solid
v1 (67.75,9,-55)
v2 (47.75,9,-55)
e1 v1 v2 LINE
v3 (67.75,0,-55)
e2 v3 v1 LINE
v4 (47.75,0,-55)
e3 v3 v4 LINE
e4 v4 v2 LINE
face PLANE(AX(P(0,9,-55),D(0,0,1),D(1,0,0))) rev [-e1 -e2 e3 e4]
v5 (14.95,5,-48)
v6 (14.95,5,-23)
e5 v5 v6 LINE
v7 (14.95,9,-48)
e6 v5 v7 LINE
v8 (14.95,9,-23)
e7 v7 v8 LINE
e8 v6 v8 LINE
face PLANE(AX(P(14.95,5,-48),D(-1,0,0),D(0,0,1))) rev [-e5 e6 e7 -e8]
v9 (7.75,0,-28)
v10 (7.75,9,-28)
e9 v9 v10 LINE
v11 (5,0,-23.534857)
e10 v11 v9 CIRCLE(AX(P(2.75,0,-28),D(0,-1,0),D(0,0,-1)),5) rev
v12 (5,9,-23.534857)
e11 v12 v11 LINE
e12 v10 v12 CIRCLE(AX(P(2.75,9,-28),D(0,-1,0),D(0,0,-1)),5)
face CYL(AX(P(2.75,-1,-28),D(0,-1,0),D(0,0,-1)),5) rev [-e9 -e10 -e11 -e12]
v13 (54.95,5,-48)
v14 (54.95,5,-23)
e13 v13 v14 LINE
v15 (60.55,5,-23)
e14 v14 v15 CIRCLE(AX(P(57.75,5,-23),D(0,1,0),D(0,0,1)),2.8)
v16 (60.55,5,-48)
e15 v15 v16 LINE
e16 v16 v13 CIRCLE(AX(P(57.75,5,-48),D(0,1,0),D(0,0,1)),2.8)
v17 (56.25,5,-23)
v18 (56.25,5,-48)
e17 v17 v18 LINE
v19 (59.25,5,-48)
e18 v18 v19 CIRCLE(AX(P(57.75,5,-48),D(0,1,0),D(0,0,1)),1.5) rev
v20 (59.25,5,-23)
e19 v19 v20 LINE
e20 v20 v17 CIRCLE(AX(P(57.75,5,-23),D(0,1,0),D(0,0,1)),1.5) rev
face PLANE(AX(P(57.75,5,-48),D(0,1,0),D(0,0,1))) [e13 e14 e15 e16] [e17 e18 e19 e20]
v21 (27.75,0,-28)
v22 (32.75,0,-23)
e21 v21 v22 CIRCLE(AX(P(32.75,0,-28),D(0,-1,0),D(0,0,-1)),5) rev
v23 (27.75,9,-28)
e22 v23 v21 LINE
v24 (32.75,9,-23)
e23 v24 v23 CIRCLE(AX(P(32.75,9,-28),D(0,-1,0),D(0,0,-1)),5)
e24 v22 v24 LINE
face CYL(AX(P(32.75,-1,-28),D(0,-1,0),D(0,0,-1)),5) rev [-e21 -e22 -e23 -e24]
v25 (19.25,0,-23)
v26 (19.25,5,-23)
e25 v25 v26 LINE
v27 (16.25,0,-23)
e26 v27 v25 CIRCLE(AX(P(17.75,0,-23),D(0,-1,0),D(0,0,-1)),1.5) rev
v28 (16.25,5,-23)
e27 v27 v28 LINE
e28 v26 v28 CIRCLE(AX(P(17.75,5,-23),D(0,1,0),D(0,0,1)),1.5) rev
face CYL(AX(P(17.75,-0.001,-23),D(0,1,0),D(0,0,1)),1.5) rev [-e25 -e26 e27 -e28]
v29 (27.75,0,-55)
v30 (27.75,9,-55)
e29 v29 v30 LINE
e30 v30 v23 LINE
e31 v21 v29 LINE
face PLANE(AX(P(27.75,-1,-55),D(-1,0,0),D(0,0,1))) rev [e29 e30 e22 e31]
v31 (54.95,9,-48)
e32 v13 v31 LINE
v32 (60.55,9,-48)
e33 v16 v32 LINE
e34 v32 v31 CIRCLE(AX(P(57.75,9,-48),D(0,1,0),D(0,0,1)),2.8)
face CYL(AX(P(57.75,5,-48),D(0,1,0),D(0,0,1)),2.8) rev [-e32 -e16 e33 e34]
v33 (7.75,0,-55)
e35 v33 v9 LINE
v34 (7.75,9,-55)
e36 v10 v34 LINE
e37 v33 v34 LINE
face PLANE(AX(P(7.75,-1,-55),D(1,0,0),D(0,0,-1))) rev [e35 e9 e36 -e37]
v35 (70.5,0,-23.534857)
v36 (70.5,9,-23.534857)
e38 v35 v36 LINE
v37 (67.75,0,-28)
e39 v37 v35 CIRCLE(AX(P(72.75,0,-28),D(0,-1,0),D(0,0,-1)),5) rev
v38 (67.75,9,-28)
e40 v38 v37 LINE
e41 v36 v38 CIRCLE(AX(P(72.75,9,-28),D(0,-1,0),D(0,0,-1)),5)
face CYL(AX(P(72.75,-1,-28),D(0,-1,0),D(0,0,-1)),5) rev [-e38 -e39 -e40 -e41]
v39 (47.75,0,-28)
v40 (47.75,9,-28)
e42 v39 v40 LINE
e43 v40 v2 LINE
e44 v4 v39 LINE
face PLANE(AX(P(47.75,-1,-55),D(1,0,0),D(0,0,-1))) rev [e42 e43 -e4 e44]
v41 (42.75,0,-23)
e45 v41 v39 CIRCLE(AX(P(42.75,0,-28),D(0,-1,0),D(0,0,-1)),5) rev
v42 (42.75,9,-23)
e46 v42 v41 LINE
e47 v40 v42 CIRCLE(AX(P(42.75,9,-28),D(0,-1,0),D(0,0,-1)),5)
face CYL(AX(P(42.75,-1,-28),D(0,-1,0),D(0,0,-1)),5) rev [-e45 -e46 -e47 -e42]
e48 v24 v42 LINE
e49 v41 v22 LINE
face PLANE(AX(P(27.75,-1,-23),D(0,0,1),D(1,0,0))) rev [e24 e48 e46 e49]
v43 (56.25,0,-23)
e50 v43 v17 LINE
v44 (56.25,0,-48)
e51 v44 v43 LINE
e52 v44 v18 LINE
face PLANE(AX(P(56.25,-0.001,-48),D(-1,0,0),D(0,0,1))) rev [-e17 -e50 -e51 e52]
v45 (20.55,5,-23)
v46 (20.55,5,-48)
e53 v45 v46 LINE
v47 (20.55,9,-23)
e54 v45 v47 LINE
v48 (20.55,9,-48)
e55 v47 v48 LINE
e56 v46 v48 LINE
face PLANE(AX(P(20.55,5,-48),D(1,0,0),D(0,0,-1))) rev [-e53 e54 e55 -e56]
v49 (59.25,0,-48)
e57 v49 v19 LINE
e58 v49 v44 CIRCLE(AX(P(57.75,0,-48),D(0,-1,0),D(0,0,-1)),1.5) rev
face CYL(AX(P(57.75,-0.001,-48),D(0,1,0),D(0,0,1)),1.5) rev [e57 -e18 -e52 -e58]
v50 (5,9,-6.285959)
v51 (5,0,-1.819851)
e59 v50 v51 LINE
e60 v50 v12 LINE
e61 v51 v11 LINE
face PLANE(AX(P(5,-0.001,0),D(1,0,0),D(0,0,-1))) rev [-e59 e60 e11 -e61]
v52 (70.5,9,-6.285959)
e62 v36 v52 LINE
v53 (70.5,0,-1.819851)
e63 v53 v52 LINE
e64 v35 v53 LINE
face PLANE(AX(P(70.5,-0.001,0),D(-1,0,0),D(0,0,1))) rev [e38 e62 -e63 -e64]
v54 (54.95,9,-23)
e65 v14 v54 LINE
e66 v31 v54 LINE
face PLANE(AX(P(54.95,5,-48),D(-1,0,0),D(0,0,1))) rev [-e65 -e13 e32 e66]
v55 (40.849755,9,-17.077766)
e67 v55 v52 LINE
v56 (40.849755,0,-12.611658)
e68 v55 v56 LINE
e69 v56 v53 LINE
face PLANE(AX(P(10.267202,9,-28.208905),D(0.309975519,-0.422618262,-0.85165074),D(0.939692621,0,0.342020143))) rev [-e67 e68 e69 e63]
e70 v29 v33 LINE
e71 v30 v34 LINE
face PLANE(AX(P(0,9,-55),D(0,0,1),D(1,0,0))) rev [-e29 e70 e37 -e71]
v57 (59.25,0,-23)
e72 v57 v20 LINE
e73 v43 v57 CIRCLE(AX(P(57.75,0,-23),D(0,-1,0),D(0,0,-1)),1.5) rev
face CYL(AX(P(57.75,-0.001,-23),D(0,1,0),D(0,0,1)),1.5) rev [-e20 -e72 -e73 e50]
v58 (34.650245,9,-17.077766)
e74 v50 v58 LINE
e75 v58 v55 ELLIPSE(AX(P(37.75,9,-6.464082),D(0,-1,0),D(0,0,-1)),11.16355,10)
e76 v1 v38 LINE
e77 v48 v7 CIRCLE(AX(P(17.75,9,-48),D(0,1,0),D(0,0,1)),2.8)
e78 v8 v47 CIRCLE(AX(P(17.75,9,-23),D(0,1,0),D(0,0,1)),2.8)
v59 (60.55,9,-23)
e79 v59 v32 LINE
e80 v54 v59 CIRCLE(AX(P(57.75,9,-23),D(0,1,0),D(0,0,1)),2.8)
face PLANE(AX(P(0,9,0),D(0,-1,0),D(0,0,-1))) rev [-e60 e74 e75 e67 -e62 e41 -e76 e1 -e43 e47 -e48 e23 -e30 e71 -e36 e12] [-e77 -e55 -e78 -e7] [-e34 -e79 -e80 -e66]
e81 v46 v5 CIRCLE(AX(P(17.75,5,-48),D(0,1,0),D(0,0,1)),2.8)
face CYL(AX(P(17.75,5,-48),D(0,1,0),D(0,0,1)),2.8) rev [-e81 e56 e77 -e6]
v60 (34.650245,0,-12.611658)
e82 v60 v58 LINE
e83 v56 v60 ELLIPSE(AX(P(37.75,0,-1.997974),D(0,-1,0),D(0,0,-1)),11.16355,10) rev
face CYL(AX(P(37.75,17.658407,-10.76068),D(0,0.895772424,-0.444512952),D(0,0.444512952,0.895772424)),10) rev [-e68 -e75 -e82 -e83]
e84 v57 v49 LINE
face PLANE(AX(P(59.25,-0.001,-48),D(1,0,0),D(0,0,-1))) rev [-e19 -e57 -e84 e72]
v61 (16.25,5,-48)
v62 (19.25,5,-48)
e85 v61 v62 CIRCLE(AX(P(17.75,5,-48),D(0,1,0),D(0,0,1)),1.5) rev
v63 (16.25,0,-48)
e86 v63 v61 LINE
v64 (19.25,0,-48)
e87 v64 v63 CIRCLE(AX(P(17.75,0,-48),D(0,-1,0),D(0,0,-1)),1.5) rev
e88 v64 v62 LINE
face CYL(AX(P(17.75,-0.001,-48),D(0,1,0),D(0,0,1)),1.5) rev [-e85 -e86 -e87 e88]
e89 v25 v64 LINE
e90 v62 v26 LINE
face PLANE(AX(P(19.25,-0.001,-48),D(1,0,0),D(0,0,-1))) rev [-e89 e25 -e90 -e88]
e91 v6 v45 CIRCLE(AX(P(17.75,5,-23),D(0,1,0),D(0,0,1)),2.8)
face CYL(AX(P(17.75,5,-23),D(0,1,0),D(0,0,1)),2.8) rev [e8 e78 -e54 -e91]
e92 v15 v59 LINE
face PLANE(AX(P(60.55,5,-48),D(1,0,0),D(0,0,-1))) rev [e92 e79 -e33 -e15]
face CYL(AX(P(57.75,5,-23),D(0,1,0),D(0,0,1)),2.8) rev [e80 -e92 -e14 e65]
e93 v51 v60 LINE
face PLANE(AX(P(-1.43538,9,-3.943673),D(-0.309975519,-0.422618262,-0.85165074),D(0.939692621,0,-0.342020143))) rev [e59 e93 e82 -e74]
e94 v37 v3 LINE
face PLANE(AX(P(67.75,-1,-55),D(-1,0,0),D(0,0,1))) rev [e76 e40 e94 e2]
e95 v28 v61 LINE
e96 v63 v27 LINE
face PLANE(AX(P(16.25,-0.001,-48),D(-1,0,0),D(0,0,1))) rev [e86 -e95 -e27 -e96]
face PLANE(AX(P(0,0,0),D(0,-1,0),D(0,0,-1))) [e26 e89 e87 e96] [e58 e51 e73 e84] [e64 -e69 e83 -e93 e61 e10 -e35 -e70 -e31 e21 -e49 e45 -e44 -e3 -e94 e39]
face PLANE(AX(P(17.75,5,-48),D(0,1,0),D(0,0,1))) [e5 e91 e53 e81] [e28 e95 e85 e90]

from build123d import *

# Parameters (mm, degrees)
BOSS_EXTRUDE1_DEPTH = 9
CUT_EXTRUDE2_REACH  = 95.842
SKETCH5_W           = 20
SKETCH5_H           = 32
SKETCH5_W_2         = 7.75
CUT_EXTRUDE3_DEPTH  = 10
FILLET1_R           = 5
CUT_EXTRUDE4_DEPTH  = 4
CHAMFER1_SIZE       = 9
CHAMFER1_SIZE_2     = 4.196768923
FILLET2_R           = 10
CUT_EXTRUDE5_REACH  = 95.842
SKETCH7_W           = 5
SKETCH7_H           = 33.085129134
SKETCH7_H_2         = 33.745309592


with BuildPart() as part:
    # Sketch1 → Boss-Extrude1 (new body)
    with BuildSketch(Plane(origin=(0, 0, 0), x_dir=(1, 0, 0), z_dir=(0, 1, 0))):
        Polygon((0, 0), (0, 55), (75.5, 55), (75.5, 0), (37.75, 13.739876344), align=None)
    extrude(amount=BOSS_EXTRUDE1_DEPTH)

    # Sketch4 → Cut-Extrude2 (cut, up to next)
    with BuildSketch(Plane(origin=(0, 9, 0), x_dir=(1, 0, 0), z_dir=(0, 1, 0)), mode=Mode.PRIVATE) as cut_extrude2_sk1:
        with BuildLine():
            Line((19.25, 48), (19.25, 23))
            ThreePointArc((19.25, 23), (17.75, 21.5), (16.25, 23))
            Line((16.25, 23), (16.25, 48))
            ThreePointArc((16.25, 48), (17.75, 49.5), (19.25, 48))
        make_face()
    cut_extrude2_tool1 = extrude(cut_extrude2_sk1.sketch, amount=-CUT_EXTRUDE2_REACH, mode=Mode.PRIVATE) & part.part
    # Sketch4 → Cut-Extrude2 (cut, up to next)
    with BuildSketch(Plane(origin=(0, 9, 0), x_dir=(1, 0, 0), z_dir=(0, 1, 0)), mode=Mode.PRIVATE) as cut_extrude2_sk2:
        with BuildLine():
            Line((59.25, 48), (59.25, 23))
            ThreePointArc((59.25, 23), (57.75, 21.5), (56.25, 23))
            Line((56.25, 23), (56.25, 48))
            ThreePointArc((56.25, 48), (57.75, 49.5), (59.25, 48))
        make_face()
    cut_extrude2_tool2 = extrude(cut_extrude2_sk2.sketch, amount=-CUT_EXTRUDE2_REACH, mode=Mode.PRIVATE) & part.part
    add(cut_extrude2_tool1.solids().sort_by_distance((17.75, 9, -35.5))[0], mode=Mode.SUBTRACT)
    add(cut_extrude2_tool2.solids().sort_by_distance((57.75, 9, -35.5))[0], mode=Mode.SUBTRACT)

    # Sketch5 → Cut-Extrude3 (cut)
    with BuildSketch(Plane(origin=(0, 9, 0), x_dir=(1, 0, 0), z_dir=(0, 1, 0))):
        with Locations((37.75, 39)):
            Rectangle(SKETCH5_W, SKETCH5_H)
        with Locations((71.625, 39)):
            Rectangle(SKETCH5_W_2, SKETCH5_H)
        with Locations((3.875, 39)):
            Rectangle(SKETCH5_W_2, SKETCH5_H)
    extrude(amount=-CUT_EXTRUDE3_DEPTH, mode=Mode.SUBTRACT)

    # Fillet1
    fillet1_edges = [part.edges().sort_by_distance(p)[0] for p in [
        (27.75, 4.5, -23),
        (47.75, 4.5, -23),
        (7.75, 4.5, -23),
        (67.75, 4.5, -23),
    ]]
    fillet(fillet1_edges, radius=FILLET1_R)

    # Sketch6 → Cut-Extrude4 (cut)
    with BuildSketch(Plane(origin=(0, 9, 0), x_dir=(1, 0, 0), z_dir=(0, 1, 0))):
        with BuildLine():
            Line((20.55, 48), (20.55, 23))
            ThreePointArc((20.55, 23), (17.75, 20.2), (14.95, 23))
            Line((14.95, 23), (14.95, 48))
            ThreePointArc((14.95, 48), (17.75, 50.8), (20.55, 48))
        make_face()
        with BuildLine():
            Line((60.55, 48), (60.55, 23))
            ThreePointArc((60.55, 23), (57.75, 20.2), (54.95, 23))
            Line((54.95, 23), (54.95, 48))
            ThreePointArc((54.95, 48), (57.75, 50.8), (60.55, 48))
        make_face()
    extrude(amount=-CUT_EXTRUDE4_DEPTH, mode=Mode.SUBTRACT)

    # Chamfer1
    # the kernel refuses this chamfer: 9, 4.196768923 mm, written as the material it takes off along each edge
    with BuildSketch(Plane(origin=(97.41248478, 9, 7.975492219), x_dir=(-0.005578746693930982, -0.9998669641130703, 0.015327480570432298), z_dir=(-0.939692620785907, 0, -0.3420201433256727))) as chamfer1_piece_1_section:
        Polygon((CHAMFER1_SIZE * 0.999866964113, -CHAMFER1_SIZE * 0.0163111641311), (-CHAMFER1_SIZE_2 * 0.0163111641326, -CHAMFER1_SIZE_2 * 0.999866964207), (0, 0), align=None)
    chamfer1_piece_1 = extrude(amount=86.810269397, mode=Mode.PRIVATE)
    chamfer1_piece_1 = split(chamfer1_piece_1, bisect_by=Plane(origin=(61.945555659, 5.929396418, -22.546338405), z_dir=(0.3420201433256727, 0, 0.939692620785907)), keep=Keep.TOP, mode=Mode.PRIVATE)
    add(chamfer1_piece_1, mode=Mode.SUBTRACT)
    with BuildSketch(Plane(origin=(59.66248478, 9, -21.715368562), x_dir=(0.0055787466939309265, -0.9998669641130703, 0.015327480570432147), z_dir=(-0.939692620785907, 0, 0.3420201433256727))) as chamfer1_piece_2_section:
        Polygon((CHAMFER1_SIZE * 0.999866964113, -CHAMFER1_SIZE * 0.0163111641311), (-CHAMFER1_SIZE_2 * 0.0163111641326, -CHAMFER1_SIZE_2 * 0.999866964207), (0, 0), align=None)
    chamfer1_piece_2 = extrude(amount=86.810269397, mode=Mode.PRIVATE)
    chamfer1_piece_2 = split(chamfer1_piece_2, bisect_by=Plane(origin=(13.554444341, 5.929396418, -22.546338405), z_dir=(-0.3420201433256727, 0, 0.939692620785907)), keep=Keep.TOP, mode=Mode.PRIVATE)
    add(chamfer1_piece_2, mode=Mode.SUBTRACT)
    with BuildSketch(Plane(origin=(97.41248478, 9, 7.975492219), x_dir=(-0.005578746693930982, -0.9998669641130703, 0.015327480570432298), z_dir=(-0.939692620785907, 0, -0.3420201433256727))) as chamfer1_piece_3a_section:
        Polygon((CHAMFER1_SIZE * 0.999866964113, -CHAMFER1_SIZE * 0.0163111641311), (-CHAMFER1_SIZE_2 * 0.0163111641326, -CHAMFER1_SIZE_2 * 0.999866964207), (0, 0), align=None)
    chamfer1_piece_3a = extrude(amount=86.810269397, mode=Mode.PRIVATE)
    chamfer1_piece_3a = split(chamfer1_piece_3a, bisect_by=Plane(origin=(30.782637317, 6.02174195, -11.203963716), z_dir=(-0.3420201433256727, 0, -0.939692620785907)), keep=Keep.TOP, mode=Mode.PRIVATE)
    with BuildSketch(Plane(origin=(59.66248478, 9, -21.715368562), x_dir=(0.0055787466939309265, -0.9998669641130703, 0.015327480570432147), z_dir=(-0.939692620785907, 0, 0.3420201433256727))) as chamfer1_piece_3b_section:
        Polygon((CHAMFER1_SIZE * 0.999866964113, -CHAMFER1_SIZE * 0.0163111641311), (-CHAMFER1_SIZE_2 * 0.0163111641326, -CHAMFER1_SIZE_2 * 0.999866964207), (0, 0), align=None)
    chamfer1_piece_3b = extrude(amount=86.810269397, mode=Mode.PRIVATE)
    chamfer1_piece_3b = split(chamfer1_piece_3b, bisect_by=Plane(origin=(44.717362683, 6.02174195, -11.203963716), z_dir=(0.3420201433256727, 0, -0.939692620785907)), keep=Keep.TOP, mode=Mode.PRIVATE)
    chamfer1_piece_3 = chamfer1_piece_3a & chamfer1_piece_3b
    add(chamfer1_piece_3, mode=Mode.SUBTRACT)

    # Fillet2
    fillet2_edges = [part.edges().sort_by_distance(p)[0] for p in [
        (37.75, 4.5, -15.972930446),
    ]]
    fillet(fillet2_edges, radius=FILLET2_R)

    # Sketch7 → Cut-Extrude5 (cut, up to next)
    with BuildSketch(Plane(origin=(0, 9, 0), x_dir=(1, 0, 0), z_dir=(0, 1, 0)), mode=Mode.PRIVATE) as cut_extrude5_sk1:
        with Locations((2.5, 16.542564567)):
            Rectangle(SKETCH7_W, SKETCH7_H)
    cut_extrude5_tool1 = extrude(cut_extrude5_sk1.sketch, amount=-CUT_EXTRUDE5_REACH, mode=Mode.PRIVATE) & part.part
    # Sketch7 → Cut-Extrude5 (cut, up to next)
    with BuildSketch(Plane(origin=(0, 9, 0), x_dir=(1, 0, 0), z_dir=(0, 1, 0)), mode=Mode.PRIVATE) as cut_extrude5_sk2:
        with Locations((73, 16.872654796)):
            Rectangle(SKETCH7_W, SKETCH7_H_2)
    cut_extrude5_tool2 = extrude(cut_extrude5_sk2.sketch, amount=-CUT_EXTRUDE5_REACH, mode=Mode.PRIVATE) & part.part
    add(cut_extrude5_tool1.solids().sort_by_distance((2.5, 9, -16.542565))[0], mode=Mode.SUBTRACT)
    add(cut_extrude5_tool2.solids().sort_by_distance((73, 9, -16.872655))[0], mode=Mode.SUBTRACT)


solid = part.part
